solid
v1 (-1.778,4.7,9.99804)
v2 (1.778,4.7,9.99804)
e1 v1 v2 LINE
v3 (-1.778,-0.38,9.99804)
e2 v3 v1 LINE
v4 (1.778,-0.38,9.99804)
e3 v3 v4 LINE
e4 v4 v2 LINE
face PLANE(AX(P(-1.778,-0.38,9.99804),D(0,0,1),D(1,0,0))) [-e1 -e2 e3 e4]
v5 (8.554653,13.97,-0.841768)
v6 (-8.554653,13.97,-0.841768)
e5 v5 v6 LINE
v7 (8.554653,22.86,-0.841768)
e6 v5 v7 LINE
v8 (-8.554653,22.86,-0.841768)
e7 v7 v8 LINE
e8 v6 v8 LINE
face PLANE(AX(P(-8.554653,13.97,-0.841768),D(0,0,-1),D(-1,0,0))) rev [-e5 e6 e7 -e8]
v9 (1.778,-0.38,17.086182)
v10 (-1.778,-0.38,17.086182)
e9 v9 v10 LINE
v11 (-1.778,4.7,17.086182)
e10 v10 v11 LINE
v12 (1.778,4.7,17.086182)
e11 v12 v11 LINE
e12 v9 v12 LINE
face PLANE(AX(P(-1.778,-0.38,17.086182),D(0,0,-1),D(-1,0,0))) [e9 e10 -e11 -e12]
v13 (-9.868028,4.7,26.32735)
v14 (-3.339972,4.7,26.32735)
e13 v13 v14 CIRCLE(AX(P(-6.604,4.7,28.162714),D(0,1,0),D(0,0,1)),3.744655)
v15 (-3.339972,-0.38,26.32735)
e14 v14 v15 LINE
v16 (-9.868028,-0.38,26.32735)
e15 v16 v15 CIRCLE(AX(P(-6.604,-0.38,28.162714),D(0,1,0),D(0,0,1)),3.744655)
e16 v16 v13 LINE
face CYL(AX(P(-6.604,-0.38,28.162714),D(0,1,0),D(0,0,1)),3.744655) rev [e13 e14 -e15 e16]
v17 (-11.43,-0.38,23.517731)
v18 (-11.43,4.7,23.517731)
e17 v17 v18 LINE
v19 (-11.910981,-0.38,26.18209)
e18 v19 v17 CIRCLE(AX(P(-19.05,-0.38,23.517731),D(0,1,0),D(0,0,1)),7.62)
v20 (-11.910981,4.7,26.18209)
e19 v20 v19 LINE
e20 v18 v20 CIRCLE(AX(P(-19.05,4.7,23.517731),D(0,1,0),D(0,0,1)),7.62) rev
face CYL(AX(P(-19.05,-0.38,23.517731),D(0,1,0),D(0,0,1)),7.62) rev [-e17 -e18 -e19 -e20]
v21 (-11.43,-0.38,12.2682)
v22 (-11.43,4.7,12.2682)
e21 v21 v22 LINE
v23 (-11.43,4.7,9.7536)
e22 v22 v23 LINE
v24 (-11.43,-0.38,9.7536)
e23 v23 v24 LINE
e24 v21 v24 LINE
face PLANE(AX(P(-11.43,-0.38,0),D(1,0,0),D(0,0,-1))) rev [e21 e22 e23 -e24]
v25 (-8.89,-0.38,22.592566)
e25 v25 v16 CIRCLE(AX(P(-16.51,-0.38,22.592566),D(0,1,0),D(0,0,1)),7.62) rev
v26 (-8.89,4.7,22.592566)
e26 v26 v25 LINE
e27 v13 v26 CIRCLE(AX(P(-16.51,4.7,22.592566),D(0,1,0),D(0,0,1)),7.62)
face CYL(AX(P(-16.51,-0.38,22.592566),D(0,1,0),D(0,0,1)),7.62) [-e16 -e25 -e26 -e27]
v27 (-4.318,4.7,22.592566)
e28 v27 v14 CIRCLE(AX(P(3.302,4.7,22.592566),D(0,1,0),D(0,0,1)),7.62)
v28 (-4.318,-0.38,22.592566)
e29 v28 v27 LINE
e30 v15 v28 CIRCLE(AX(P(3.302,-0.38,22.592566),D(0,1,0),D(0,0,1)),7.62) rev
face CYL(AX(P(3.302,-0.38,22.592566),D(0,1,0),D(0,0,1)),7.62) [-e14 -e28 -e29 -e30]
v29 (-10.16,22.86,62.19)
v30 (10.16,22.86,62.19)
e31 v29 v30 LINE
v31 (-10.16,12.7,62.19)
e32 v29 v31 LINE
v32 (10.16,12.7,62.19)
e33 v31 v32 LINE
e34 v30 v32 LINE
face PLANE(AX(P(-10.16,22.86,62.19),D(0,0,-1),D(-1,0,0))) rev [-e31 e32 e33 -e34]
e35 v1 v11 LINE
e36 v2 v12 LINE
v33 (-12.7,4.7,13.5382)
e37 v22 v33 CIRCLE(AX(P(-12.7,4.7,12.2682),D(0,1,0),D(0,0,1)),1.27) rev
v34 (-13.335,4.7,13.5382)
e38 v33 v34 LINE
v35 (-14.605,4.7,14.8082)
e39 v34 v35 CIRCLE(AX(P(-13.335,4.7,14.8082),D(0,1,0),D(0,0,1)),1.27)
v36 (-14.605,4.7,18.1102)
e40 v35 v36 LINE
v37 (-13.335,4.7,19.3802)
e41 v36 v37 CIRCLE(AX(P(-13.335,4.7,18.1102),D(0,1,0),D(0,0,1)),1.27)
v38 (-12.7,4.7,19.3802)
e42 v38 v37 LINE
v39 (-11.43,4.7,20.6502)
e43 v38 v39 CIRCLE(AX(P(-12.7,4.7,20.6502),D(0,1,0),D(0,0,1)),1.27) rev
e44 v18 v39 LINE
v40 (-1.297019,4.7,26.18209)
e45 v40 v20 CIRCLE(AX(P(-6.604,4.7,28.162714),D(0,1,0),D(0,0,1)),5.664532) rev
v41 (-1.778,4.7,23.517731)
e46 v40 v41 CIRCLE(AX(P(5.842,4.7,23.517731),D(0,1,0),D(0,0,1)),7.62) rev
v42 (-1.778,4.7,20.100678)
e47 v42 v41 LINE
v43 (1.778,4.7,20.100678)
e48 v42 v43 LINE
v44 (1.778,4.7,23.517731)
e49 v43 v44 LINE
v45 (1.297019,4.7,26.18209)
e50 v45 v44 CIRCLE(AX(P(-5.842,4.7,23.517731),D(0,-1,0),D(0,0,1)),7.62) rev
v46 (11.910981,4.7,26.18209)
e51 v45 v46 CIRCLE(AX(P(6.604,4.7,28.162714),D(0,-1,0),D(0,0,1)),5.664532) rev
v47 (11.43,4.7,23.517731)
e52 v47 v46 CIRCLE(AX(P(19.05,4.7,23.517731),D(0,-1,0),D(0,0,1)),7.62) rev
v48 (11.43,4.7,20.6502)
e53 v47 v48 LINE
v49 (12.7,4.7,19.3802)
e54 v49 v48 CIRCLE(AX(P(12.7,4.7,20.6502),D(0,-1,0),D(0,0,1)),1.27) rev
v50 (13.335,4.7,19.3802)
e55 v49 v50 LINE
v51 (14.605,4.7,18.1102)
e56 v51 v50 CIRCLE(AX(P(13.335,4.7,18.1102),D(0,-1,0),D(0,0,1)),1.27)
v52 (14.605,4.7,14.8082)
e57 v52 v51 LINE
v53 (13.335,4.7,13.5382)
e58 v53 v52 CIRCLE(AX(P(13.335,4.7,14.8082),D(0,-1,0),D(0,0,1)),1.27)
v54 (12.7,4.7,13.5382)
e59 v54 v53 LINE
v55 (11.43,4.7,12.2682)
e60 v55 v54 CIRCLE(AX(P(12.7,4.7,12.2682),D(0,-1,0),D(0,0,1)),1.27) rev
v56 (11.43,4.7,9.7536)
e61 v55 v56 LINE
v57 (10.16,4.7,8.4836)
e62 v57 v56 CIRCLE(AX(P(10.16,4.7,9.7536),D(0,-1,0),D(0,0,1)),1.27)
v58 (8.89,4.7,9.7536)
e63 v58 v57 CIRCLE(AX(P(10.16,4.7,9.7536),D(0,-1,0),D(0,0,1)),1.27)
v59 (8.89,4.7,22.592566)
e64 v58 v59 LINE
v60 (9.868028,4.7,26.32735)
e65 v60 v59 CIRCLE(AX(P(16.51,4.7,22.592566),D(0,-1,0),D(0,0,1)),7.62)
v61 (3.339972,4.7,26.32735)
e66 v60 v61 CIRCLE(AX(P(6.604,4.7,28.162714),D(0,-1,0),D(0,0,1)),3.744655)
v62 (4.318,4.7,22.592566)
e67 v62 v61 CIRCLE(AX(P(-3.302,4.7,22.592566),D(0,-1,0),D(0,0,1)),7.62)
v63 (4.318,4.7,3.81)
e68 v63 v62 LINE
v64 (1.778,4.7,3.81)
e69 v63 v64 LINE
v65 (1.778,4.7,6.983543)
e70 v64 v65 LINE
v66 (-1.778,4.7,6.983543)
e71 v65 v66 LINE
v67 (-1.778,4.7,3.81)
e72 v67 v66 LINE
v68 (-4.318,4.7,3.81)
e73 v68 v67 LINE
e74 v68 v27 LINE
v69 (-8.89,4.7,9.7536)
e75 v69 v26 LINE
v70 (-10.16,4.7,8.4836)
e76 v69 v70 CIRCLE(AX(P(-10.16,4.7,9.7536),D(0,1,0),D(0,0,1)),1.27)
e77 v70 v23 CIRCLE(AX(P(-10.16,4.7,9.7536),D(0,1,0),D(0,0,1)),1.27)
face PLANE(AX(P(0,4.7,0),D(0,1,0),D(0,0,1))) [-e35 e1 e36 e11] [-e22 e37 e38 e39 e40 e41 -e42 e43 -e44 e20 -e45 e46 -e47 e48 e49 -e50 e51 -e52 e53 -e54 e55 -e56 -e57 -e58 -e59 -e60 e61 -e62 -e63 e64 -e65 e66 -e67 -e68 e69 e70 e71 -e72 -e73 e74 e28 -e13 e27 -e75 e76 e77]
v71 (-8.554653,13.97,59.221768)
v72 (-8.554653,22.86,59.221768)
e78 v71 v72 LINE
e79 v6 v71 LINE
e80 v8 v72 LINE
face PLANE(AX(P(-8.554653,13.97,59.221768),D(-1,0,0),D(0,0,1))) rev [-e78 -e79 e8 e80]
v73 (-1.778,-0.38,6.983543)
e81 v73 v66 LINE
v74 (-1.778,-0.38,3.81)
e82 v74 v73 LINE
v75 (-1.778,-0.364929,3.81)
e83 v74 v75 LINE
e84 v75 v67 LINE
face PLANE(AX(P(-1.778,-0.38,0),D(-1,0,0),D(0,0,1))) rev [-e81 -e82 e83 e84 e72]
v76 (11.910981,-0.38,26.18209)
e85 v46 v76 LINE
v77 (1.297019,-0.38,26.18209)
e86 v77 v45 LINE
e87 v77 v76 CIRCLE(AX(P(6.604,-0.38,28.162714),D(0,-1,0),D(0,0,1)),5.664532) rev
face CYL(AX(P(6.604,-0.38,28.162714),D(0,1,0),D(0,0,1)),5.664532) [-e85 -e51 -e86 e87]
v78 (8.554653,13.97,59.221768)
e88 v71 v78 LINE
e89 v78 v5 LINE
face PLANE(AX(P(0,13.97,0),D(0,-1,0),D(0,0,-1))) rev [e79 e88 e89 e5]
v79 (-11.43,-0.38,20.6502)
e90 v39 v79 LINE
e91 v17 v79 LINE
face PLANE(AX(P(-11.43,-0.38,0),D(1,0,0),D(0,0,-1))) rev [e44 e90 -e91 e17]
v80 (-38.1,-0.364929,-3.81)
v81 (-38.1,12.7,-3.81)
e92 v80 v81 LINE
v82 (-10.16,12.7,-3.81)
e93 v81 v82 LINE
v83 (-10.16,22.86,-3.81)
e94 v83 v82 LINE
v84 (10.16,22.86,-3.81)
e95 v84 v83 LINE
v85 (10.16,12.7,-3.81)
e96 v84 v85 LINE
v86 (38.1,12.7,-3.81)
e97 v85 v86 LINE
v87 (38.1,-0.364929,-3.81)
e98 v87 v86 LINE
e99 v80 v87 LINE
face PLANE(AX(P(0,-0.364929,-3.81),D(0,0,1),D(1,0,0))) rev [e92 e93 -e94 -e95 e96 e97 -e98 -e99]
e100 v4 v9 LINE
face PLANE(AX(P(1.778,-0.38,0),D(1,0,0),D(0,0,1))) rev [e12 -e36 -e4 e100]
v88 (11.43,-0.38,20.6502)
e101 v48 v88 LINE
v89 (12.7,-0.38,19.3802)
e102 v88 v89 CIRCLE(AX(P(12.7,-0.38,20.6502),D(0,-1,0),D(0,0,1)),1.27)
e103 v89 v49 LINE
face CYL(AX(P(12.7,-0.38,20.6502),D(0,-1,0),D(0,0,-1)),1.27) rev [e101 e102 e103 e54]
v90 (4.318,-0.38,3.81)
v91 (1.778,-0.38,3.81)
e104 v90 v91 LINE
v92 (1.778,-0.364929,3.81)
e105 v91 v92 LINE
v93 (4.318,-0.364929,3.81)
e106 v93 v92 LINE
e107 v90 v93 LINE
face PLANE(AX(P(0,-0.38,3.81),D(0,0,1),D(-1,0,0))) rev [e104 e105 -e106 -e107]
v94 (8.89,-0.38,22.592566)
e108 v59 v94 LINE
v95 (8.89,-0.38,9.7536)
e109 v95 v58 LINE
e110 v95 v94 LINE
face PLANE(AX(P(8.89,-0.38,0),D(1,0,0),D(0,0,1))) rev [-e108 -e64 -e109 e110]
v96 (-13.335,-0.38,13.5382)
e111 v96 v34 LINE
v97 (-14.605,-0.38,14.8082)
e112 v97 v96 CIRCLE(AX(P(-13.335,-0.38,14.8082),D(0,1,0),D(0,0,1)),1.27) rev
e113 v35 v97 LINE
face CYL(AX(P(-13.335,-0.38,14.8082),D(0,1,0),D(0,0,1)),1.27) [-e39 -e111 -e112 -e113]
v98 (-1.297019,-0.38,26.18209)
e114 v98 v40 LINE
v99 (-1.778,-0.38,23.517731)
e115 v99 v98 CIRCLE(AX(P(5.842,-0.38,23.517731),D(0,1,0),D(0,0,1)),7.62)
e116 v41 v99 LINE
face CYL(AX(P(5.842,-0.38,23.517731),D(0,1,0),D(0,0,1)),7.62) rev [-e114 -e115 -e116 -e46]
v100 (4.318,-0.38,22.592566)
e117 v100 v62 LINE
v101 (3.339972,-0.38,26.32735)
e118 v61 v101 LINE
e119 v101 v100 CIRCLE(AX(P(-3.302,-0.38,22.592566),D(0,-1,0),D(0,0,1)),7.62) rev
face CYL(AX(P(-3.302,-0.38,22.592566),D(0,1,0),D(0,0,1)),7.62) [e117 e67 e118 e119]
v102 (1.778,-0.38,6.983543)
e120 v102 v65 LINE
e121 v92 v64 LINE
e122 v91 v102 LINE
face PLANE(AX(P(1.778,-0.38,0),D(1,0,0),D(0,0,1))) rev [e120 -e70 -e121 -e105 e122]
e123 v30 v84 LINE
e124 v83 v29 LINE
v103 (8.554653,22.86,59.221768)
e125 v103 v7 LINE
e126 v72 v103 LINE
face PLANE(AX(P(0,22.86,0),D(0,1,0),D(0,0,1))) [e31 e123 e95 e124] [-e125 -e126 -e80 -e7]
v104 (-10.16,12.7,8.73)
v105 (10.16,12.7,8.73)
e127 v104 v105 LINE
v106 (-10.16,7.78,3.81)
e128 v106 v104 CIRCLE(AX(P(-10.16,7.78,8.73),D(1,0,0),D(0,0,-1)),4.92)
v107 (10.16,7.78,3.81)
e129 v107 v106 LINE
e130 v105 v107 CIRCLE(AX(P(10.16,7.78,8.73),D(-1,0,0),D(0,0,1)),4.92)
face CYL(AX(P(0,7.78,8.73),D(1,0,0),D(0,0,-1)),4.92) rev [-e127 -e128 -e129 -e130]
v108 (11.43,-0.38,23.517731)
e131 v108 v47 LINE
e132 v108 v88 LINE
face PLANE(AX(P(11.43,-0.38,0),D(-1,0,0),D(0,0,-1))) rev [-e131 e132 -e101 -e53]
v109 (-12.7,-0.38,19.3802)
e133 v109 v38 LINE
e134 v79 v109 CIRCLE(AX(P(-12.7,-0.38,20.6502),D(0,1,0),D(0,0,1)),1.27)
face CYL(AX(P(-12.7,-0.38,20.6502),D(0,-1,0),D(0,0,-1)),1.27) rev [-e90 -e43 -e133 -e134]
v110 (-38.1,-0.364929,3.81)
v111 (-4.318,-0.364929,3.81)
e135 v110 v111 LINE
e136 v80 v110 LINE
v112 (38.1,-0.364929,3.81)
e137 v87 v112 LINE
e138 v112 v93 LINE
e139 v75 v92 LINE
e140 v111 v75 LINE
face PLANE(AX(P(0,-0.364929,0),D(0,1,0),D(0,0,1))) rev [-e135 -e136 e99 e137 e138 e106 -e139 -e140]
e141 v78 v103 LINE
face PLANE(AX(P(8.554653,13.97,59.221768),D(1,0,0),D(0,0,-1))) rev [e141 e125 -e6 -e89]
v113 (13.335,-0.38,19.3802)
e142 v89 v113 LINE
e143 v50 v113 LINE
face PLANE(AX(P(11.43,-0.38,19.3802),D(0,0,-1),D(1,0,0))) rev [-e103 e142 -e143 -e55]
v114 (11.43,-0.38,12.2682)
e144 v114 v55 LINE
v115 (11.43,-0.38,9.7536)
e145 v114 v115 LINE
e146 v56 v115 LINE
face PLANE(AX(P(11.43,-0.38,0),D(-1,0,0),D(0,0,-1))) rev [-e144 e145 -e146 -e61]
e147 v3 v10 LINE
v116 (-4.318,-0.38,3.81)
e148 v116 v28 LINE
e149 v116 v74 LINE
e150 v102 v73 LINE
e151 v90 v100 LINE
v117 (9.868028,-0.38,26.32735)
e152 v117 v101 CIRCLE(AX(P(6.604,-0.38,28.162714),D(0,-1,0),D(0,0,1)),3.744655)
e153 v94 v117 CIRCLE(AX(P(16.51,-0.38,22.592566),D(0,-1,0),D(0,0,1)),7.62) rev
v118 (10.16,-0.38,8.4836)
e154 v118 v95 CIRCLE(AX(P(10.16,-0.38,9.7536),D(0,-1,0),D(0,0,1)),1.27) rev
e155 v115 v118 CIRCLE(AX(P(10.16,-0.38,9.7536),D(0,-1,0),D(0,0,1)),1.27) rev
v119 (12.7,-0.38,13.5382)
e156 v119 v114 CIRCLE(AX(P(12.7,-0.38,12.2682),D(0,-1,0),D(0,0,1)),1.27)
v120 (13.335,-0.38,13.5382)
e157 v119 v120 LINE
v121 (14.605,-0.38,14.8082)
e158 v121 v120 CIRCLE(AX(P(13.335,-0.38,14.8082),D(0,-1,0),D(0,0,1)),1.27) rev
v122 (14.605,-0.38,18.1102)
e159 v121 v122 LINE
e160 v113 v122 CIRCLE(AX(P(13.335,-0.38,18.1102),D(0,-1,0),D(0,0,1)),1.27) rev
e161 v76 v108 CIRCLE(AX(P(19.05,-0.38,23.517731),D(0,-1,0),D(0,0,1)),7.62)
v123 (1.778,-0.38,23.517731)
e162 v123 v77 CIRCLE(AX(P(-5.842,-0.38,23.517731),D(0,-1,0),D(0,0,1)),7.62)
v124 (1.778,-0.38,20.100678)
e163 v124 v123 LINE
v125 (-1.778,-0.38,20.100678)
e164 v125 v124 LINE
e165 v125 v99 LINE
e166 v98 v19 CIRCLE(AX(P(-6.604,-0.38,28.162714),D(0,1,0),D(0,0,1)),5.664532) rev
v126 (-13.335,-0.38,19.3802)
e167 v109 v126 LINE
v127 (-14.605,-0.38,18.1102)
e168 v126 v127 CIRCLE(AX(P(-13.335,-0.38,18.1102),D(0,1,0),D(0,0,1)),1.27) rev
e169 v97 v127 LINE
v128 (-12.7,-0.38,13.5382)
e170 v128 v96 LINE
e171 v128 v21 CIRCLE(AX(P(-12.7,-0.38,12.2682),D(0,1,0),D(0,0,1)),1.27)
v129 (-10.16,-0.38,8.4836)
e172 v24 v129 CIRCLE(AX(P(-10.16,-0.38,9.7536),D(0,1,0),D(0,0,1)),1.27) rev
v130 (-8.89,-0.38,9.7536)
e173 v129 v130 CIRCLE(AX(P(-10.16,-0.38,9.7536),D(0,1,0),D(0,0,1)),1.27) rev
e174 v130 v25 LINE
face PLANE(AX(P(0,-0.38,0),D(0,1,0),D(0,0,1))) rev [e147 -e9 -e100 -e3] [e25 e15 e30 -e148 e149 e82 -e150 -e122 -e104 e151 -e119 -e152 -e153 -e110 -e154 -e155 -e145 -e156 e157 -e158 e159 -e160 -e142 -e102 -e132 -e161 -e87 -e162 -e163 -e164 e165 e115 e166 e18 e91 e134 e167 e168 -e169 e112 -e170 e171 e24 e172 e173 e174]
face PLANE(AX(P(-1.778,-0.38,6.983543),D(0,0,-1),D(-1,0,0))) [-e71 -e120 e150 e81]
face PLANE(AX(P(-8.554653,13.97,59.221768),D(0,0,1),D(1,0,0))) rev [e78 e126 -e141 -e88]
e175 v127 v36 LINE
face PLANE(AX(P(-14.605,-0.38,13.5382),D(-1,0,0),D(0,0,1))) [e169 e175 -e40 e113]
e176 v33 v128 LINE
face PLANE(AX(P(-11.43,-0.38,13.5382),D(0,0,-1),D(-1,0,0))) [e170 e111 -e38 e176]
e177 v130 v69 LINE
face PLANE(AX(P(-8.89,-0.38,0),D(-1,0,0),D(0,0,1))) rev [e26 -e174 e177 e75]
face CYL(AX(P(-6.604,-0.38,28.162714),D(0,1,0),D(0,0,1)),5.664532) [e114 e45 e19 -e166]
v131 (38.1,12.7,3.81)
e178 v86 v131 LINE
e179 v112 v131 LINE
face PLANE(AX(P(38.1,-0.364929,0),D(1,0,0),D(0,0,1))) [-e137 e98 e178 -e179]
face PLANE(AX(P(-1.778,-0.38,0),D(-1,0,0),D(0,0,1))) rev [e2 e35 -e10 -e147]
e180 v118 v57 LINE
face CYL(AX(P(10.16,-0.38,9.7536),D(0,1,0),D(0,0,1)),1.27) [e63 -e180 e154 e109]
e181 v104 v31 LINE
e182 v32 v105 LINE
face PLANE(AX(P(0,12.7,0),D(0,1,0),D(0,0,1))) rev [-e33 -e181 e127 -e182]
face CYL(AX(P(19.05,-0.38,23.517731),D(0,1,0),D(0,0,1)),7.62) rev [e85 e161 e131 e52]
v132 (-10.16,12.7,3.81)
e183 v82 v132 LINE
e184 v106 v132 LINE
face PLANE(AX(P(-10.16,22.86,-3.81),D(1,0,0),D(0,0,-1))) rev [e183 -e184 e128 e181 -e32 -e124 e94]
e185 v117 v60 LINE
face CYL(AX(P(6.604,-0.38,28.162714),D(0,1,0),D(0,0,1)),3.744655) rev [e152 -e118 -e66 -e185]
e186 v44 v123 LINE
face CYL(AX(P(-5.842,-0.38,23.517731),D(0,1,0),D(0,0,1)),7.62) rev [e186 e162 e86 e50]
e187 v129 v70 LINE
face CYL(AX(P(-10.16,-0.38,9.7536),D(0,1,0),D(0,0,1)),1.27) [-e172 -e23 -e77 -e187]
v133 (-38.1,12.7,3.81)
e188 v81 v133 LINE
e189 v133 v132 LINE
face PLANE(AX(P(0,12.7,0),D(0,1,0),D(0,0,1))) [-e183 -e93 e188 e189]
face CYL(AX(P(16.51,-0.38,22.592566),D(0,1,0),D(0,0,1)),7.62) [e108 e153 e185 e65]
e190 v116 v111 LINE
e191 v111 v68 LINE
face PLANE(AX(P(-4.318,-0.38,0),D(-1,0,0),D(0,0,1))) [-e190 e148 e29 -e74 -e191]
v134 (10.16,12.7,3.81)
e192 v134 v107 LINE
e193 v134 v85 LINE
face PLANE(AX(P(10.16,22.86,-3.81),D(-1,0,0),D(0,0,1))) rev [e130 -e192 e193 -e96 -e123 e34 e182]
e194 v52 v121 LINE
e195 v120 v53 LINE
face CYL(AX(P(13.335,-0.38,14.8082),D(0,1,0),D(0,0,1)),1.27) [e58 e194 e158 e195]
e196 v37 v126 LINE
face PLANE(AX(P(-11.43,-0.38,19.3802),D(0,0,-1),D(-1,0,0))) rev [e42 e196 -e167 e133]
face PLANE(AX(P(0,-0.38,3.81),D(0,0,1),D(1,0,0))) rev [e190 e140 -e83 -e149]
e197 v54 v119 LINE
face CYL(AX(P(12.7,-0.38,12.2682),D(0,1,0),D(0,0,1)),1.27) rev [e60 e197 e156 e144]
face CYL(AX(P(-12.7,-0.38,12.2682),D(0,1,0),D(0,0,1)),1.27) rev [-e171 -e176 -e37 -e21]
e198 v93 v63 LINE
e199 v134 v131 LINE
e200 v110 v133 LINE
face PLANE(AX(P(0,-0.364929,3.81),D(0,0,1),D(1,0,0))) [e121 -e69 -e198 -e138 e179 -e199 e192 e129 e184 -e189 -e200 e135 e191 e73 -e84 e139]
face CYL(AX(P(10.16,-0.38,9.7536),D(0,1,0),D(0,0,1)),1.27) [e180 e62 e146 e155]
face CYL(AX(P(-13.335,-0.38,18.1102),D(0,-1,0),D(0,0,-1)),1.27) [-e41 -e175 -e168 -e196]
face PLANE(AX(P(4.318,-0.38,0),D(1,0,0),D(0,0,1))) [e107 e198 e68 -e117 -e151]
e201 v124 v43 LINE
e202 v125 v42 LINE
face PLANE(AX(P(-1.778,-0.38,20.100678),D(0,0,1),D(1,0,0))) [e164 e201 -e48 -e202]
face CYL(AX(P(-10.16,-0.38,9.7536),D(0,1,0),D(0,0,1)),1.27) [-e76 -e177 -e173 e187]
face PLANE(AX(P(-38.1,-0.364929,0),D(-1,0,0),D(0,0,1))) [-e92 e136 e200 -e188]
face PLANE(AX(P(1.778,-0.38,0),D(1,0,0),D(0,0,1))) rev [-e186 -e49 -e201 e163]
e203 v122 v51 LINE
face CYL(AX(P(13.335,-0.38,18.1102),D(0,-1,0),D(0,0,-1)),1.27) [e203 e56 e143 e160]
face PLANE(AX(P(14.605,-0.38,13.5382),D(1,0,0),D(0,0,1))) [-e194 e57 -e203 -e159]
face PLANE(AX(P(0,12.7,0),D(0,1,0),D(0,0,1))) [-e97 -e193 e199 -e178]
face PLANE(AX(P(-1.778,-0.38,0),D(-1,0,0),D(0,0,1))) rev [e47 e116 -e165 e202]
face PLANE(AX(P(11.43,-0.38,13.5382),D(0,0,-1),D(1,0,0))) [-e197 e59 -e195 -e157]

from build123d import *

# Parameters (mm, degrees)
BOSS_EXTRUDE1_DEPTH      = 12.7
BOSS_EXTRUDE1_DEPTH_BACK = 0.364929482
SKETCH1_W                = 76.2
SKETCH1_H                = 7.62
SKETCH14_W               = 38.1
SKETCH14_H               = 7.62
CUT_EXTRUDE5_DEPTH       = 19.558
BOSS_EXTRUDE2_START      = -8
SKETCH15_W               = 2.54
SKETCH15_H               = 21.3868
SKETCH15_W_2             = 3.175
SKETCH15_H_2             = 5.842
BOSS_EXTRUDE2_DEPTH      = 5.08
FILLET1_R                = 7.62
FILLET2_R                = 1.27
SKETCH17_W               = 3.556
SKETCH17_H               = 3.014496912
BOSS_EXTRUDE3_DEPTH      = 5.08
SKETCH18_W               = 20.32
SKETCH18_H               = 66
BOSS_EXTRUDE4_DEPTH      = 10.16
SKETCH19_W               = 17.109306796
SKETCH19_H               = 60.063536248
CUT_EXTRUDE14_DEPTH      = 8.89
FILLET3_R                = 4.92


with BuildPart() as part:
    # Sketch1 → Boss-Extrude1 (new, two sides: drawn at the far end of the back side and taken through both)
    with BuildSketch(Plane(origin=(0, 0, 0), x_dir=(1, 0, 0), z_dir=(0, 1, 0)).offset(-BOSS_EXTRUDE1_DEPTH_BACK)):
        Rectangle(SKETCH1_W, SKETCH1_H)
    extrude(amount=BOSS_EXTRUDE1_DEPTH + BOSS_EXTRUDE1_DEPTH_BACK)

    # Sketch14 → Cut-Extrude5 (cut)
    with BuildSketch(Plane(origin=(0, 12.7, 0), x_dir=(1, 0, 0), z_dir=(0, 1, 0))):
        with Locations((19.05, 0)):
            Rectangle(SKETCH14_W, SKETCH14_H)
    extrude(amount=-CUT_EXTRUDE5_DEPTH, mode=Mode.SUBTRACT)

    # Sketch15 → Boss-Extrude2 (add)
    with BuildSketch(Plane(origin=(0, 12.7, 0), x_dir=(1, 0, 0), z_dir=(0, 1, 0)).offset(BOSS_EXTRUDE2_START)):
        with Locations((-3.048, -14.5034)):
            Rectangle(SKETCH15_W, SKETCH15_H)
        with BuildLine():
            ThreePointArc((-8.89, -25.1968), (-6.604, -31.907368859), (-4.318, -25.1968))
            Line((-4.318, -25.1968), (-1.778, -25.1968))
            ThreePointArc((-1.778, -25.1968), (-6.604, -33.827245709), (-11.43, -25.1968))
            Line((-11.43, -25.1968), (-11.43, -8.4836))
            Line((-11.43, -8.4836), (-8.89, -8.4836))
            Line((-8.89, -8.4836), (-8.89, -25.1968))
        make_face()
        with Locations((-13.0175, -16.4592)):
            Rectangle(SKETCH15_W_2, SKETCH15_H_2)
    extrude(amount=-BOSS_EXTRUDE2_DEPTH)

    # Fillet1
    fillet1_edges = [part.edges().sort_by_distance(p)[0] for p in [
        (-11.43, 2.16, 25.1968),
        (-1.778, 2.16, 25.1968),
        (-8.89, 2.16, 25.1968),
        (-4.318, 2.16, 25.1968),
    ]]
    fillet(fillet1_edges, radius=FILLET1_R)

    # Fillet2
    fillet2_edges = [part.edges().sort_by_distance(p)[0] for p in [
        (-11.43, 2.16, 19.3802),
        (-14.605, 2.16, 19.3802),
        (-14.605, 2.16, 13.5382),
        (-11.43, 2.16, 13.5382),
        (-8.89, 2.16, 8.4836),
        (-11.43, 2.16, 8.4836),
    ]]
    fillet(fillet2_edges, radius=FILLET2_R - 0.0001)  # a hair under: the kernel refuses the full size

    # Mirror1: part across plane


with BuildPart() as part_1:
    add(part.part)
    add(part.part.mirror(Plane(origin=(0, -6.858, -3.81), x_dir=(0, 0, 1), z_dir=(-1, 0, 0))))

    # Sketch17 → Boss-Extrude3 (add)
    with BuildSketch(Plane(origin=(0, 4.7, 0), x_dir=(1, 0, 0), z_dir=(0, 1, 0))):
        with Locations((0, -8.490791694)):
            Rectangle(SKETCH17_W, SKETCH17_H)
        with Locations((0, -18.593429993)):
            Rectangle(SKETCH17_W, SKETCH17_H)
    extrude(amount=-BOSS_EXTRUDE3_DEPTH)

    # Sketch18 → Boss-Extrude4 (add)
    with BuildSketch(Plane(origin=(0, 12.7, 0), x_dir=(1, 0, 0), z_dir=(0, 1, 0))):
        with Locations((0, -29.19)):
            Rectangle(SKETCH18_W, SKETCH18_H)
    extrude(amount=BOSS_EXTRUDE4_DEPTH)

    # Sketch19 → Cut-Extrude14 (cut)
    with BuildSketch(Plane(origin=(0, 22.86, 0), x_dir=(1, 0, 0), z_dir=(0, 1, 0))):
        with Locations((0, -29.19)):
            Rectangle(SKETCH19_W, SKETCH19_H)
    extrude(amount=-CUT_EXTRUDE14_DEPTH, mode=Mode.SUBTRACT)

    # Fillet3
    fillet3_edges = [part_1.edges().sort_by_distance(p)[0] for p in [
        (0, 12.7, 3.81),
    ]]
    fillet(fillet3_edges, radius=FILLET3_R)


solid = part_1.part
